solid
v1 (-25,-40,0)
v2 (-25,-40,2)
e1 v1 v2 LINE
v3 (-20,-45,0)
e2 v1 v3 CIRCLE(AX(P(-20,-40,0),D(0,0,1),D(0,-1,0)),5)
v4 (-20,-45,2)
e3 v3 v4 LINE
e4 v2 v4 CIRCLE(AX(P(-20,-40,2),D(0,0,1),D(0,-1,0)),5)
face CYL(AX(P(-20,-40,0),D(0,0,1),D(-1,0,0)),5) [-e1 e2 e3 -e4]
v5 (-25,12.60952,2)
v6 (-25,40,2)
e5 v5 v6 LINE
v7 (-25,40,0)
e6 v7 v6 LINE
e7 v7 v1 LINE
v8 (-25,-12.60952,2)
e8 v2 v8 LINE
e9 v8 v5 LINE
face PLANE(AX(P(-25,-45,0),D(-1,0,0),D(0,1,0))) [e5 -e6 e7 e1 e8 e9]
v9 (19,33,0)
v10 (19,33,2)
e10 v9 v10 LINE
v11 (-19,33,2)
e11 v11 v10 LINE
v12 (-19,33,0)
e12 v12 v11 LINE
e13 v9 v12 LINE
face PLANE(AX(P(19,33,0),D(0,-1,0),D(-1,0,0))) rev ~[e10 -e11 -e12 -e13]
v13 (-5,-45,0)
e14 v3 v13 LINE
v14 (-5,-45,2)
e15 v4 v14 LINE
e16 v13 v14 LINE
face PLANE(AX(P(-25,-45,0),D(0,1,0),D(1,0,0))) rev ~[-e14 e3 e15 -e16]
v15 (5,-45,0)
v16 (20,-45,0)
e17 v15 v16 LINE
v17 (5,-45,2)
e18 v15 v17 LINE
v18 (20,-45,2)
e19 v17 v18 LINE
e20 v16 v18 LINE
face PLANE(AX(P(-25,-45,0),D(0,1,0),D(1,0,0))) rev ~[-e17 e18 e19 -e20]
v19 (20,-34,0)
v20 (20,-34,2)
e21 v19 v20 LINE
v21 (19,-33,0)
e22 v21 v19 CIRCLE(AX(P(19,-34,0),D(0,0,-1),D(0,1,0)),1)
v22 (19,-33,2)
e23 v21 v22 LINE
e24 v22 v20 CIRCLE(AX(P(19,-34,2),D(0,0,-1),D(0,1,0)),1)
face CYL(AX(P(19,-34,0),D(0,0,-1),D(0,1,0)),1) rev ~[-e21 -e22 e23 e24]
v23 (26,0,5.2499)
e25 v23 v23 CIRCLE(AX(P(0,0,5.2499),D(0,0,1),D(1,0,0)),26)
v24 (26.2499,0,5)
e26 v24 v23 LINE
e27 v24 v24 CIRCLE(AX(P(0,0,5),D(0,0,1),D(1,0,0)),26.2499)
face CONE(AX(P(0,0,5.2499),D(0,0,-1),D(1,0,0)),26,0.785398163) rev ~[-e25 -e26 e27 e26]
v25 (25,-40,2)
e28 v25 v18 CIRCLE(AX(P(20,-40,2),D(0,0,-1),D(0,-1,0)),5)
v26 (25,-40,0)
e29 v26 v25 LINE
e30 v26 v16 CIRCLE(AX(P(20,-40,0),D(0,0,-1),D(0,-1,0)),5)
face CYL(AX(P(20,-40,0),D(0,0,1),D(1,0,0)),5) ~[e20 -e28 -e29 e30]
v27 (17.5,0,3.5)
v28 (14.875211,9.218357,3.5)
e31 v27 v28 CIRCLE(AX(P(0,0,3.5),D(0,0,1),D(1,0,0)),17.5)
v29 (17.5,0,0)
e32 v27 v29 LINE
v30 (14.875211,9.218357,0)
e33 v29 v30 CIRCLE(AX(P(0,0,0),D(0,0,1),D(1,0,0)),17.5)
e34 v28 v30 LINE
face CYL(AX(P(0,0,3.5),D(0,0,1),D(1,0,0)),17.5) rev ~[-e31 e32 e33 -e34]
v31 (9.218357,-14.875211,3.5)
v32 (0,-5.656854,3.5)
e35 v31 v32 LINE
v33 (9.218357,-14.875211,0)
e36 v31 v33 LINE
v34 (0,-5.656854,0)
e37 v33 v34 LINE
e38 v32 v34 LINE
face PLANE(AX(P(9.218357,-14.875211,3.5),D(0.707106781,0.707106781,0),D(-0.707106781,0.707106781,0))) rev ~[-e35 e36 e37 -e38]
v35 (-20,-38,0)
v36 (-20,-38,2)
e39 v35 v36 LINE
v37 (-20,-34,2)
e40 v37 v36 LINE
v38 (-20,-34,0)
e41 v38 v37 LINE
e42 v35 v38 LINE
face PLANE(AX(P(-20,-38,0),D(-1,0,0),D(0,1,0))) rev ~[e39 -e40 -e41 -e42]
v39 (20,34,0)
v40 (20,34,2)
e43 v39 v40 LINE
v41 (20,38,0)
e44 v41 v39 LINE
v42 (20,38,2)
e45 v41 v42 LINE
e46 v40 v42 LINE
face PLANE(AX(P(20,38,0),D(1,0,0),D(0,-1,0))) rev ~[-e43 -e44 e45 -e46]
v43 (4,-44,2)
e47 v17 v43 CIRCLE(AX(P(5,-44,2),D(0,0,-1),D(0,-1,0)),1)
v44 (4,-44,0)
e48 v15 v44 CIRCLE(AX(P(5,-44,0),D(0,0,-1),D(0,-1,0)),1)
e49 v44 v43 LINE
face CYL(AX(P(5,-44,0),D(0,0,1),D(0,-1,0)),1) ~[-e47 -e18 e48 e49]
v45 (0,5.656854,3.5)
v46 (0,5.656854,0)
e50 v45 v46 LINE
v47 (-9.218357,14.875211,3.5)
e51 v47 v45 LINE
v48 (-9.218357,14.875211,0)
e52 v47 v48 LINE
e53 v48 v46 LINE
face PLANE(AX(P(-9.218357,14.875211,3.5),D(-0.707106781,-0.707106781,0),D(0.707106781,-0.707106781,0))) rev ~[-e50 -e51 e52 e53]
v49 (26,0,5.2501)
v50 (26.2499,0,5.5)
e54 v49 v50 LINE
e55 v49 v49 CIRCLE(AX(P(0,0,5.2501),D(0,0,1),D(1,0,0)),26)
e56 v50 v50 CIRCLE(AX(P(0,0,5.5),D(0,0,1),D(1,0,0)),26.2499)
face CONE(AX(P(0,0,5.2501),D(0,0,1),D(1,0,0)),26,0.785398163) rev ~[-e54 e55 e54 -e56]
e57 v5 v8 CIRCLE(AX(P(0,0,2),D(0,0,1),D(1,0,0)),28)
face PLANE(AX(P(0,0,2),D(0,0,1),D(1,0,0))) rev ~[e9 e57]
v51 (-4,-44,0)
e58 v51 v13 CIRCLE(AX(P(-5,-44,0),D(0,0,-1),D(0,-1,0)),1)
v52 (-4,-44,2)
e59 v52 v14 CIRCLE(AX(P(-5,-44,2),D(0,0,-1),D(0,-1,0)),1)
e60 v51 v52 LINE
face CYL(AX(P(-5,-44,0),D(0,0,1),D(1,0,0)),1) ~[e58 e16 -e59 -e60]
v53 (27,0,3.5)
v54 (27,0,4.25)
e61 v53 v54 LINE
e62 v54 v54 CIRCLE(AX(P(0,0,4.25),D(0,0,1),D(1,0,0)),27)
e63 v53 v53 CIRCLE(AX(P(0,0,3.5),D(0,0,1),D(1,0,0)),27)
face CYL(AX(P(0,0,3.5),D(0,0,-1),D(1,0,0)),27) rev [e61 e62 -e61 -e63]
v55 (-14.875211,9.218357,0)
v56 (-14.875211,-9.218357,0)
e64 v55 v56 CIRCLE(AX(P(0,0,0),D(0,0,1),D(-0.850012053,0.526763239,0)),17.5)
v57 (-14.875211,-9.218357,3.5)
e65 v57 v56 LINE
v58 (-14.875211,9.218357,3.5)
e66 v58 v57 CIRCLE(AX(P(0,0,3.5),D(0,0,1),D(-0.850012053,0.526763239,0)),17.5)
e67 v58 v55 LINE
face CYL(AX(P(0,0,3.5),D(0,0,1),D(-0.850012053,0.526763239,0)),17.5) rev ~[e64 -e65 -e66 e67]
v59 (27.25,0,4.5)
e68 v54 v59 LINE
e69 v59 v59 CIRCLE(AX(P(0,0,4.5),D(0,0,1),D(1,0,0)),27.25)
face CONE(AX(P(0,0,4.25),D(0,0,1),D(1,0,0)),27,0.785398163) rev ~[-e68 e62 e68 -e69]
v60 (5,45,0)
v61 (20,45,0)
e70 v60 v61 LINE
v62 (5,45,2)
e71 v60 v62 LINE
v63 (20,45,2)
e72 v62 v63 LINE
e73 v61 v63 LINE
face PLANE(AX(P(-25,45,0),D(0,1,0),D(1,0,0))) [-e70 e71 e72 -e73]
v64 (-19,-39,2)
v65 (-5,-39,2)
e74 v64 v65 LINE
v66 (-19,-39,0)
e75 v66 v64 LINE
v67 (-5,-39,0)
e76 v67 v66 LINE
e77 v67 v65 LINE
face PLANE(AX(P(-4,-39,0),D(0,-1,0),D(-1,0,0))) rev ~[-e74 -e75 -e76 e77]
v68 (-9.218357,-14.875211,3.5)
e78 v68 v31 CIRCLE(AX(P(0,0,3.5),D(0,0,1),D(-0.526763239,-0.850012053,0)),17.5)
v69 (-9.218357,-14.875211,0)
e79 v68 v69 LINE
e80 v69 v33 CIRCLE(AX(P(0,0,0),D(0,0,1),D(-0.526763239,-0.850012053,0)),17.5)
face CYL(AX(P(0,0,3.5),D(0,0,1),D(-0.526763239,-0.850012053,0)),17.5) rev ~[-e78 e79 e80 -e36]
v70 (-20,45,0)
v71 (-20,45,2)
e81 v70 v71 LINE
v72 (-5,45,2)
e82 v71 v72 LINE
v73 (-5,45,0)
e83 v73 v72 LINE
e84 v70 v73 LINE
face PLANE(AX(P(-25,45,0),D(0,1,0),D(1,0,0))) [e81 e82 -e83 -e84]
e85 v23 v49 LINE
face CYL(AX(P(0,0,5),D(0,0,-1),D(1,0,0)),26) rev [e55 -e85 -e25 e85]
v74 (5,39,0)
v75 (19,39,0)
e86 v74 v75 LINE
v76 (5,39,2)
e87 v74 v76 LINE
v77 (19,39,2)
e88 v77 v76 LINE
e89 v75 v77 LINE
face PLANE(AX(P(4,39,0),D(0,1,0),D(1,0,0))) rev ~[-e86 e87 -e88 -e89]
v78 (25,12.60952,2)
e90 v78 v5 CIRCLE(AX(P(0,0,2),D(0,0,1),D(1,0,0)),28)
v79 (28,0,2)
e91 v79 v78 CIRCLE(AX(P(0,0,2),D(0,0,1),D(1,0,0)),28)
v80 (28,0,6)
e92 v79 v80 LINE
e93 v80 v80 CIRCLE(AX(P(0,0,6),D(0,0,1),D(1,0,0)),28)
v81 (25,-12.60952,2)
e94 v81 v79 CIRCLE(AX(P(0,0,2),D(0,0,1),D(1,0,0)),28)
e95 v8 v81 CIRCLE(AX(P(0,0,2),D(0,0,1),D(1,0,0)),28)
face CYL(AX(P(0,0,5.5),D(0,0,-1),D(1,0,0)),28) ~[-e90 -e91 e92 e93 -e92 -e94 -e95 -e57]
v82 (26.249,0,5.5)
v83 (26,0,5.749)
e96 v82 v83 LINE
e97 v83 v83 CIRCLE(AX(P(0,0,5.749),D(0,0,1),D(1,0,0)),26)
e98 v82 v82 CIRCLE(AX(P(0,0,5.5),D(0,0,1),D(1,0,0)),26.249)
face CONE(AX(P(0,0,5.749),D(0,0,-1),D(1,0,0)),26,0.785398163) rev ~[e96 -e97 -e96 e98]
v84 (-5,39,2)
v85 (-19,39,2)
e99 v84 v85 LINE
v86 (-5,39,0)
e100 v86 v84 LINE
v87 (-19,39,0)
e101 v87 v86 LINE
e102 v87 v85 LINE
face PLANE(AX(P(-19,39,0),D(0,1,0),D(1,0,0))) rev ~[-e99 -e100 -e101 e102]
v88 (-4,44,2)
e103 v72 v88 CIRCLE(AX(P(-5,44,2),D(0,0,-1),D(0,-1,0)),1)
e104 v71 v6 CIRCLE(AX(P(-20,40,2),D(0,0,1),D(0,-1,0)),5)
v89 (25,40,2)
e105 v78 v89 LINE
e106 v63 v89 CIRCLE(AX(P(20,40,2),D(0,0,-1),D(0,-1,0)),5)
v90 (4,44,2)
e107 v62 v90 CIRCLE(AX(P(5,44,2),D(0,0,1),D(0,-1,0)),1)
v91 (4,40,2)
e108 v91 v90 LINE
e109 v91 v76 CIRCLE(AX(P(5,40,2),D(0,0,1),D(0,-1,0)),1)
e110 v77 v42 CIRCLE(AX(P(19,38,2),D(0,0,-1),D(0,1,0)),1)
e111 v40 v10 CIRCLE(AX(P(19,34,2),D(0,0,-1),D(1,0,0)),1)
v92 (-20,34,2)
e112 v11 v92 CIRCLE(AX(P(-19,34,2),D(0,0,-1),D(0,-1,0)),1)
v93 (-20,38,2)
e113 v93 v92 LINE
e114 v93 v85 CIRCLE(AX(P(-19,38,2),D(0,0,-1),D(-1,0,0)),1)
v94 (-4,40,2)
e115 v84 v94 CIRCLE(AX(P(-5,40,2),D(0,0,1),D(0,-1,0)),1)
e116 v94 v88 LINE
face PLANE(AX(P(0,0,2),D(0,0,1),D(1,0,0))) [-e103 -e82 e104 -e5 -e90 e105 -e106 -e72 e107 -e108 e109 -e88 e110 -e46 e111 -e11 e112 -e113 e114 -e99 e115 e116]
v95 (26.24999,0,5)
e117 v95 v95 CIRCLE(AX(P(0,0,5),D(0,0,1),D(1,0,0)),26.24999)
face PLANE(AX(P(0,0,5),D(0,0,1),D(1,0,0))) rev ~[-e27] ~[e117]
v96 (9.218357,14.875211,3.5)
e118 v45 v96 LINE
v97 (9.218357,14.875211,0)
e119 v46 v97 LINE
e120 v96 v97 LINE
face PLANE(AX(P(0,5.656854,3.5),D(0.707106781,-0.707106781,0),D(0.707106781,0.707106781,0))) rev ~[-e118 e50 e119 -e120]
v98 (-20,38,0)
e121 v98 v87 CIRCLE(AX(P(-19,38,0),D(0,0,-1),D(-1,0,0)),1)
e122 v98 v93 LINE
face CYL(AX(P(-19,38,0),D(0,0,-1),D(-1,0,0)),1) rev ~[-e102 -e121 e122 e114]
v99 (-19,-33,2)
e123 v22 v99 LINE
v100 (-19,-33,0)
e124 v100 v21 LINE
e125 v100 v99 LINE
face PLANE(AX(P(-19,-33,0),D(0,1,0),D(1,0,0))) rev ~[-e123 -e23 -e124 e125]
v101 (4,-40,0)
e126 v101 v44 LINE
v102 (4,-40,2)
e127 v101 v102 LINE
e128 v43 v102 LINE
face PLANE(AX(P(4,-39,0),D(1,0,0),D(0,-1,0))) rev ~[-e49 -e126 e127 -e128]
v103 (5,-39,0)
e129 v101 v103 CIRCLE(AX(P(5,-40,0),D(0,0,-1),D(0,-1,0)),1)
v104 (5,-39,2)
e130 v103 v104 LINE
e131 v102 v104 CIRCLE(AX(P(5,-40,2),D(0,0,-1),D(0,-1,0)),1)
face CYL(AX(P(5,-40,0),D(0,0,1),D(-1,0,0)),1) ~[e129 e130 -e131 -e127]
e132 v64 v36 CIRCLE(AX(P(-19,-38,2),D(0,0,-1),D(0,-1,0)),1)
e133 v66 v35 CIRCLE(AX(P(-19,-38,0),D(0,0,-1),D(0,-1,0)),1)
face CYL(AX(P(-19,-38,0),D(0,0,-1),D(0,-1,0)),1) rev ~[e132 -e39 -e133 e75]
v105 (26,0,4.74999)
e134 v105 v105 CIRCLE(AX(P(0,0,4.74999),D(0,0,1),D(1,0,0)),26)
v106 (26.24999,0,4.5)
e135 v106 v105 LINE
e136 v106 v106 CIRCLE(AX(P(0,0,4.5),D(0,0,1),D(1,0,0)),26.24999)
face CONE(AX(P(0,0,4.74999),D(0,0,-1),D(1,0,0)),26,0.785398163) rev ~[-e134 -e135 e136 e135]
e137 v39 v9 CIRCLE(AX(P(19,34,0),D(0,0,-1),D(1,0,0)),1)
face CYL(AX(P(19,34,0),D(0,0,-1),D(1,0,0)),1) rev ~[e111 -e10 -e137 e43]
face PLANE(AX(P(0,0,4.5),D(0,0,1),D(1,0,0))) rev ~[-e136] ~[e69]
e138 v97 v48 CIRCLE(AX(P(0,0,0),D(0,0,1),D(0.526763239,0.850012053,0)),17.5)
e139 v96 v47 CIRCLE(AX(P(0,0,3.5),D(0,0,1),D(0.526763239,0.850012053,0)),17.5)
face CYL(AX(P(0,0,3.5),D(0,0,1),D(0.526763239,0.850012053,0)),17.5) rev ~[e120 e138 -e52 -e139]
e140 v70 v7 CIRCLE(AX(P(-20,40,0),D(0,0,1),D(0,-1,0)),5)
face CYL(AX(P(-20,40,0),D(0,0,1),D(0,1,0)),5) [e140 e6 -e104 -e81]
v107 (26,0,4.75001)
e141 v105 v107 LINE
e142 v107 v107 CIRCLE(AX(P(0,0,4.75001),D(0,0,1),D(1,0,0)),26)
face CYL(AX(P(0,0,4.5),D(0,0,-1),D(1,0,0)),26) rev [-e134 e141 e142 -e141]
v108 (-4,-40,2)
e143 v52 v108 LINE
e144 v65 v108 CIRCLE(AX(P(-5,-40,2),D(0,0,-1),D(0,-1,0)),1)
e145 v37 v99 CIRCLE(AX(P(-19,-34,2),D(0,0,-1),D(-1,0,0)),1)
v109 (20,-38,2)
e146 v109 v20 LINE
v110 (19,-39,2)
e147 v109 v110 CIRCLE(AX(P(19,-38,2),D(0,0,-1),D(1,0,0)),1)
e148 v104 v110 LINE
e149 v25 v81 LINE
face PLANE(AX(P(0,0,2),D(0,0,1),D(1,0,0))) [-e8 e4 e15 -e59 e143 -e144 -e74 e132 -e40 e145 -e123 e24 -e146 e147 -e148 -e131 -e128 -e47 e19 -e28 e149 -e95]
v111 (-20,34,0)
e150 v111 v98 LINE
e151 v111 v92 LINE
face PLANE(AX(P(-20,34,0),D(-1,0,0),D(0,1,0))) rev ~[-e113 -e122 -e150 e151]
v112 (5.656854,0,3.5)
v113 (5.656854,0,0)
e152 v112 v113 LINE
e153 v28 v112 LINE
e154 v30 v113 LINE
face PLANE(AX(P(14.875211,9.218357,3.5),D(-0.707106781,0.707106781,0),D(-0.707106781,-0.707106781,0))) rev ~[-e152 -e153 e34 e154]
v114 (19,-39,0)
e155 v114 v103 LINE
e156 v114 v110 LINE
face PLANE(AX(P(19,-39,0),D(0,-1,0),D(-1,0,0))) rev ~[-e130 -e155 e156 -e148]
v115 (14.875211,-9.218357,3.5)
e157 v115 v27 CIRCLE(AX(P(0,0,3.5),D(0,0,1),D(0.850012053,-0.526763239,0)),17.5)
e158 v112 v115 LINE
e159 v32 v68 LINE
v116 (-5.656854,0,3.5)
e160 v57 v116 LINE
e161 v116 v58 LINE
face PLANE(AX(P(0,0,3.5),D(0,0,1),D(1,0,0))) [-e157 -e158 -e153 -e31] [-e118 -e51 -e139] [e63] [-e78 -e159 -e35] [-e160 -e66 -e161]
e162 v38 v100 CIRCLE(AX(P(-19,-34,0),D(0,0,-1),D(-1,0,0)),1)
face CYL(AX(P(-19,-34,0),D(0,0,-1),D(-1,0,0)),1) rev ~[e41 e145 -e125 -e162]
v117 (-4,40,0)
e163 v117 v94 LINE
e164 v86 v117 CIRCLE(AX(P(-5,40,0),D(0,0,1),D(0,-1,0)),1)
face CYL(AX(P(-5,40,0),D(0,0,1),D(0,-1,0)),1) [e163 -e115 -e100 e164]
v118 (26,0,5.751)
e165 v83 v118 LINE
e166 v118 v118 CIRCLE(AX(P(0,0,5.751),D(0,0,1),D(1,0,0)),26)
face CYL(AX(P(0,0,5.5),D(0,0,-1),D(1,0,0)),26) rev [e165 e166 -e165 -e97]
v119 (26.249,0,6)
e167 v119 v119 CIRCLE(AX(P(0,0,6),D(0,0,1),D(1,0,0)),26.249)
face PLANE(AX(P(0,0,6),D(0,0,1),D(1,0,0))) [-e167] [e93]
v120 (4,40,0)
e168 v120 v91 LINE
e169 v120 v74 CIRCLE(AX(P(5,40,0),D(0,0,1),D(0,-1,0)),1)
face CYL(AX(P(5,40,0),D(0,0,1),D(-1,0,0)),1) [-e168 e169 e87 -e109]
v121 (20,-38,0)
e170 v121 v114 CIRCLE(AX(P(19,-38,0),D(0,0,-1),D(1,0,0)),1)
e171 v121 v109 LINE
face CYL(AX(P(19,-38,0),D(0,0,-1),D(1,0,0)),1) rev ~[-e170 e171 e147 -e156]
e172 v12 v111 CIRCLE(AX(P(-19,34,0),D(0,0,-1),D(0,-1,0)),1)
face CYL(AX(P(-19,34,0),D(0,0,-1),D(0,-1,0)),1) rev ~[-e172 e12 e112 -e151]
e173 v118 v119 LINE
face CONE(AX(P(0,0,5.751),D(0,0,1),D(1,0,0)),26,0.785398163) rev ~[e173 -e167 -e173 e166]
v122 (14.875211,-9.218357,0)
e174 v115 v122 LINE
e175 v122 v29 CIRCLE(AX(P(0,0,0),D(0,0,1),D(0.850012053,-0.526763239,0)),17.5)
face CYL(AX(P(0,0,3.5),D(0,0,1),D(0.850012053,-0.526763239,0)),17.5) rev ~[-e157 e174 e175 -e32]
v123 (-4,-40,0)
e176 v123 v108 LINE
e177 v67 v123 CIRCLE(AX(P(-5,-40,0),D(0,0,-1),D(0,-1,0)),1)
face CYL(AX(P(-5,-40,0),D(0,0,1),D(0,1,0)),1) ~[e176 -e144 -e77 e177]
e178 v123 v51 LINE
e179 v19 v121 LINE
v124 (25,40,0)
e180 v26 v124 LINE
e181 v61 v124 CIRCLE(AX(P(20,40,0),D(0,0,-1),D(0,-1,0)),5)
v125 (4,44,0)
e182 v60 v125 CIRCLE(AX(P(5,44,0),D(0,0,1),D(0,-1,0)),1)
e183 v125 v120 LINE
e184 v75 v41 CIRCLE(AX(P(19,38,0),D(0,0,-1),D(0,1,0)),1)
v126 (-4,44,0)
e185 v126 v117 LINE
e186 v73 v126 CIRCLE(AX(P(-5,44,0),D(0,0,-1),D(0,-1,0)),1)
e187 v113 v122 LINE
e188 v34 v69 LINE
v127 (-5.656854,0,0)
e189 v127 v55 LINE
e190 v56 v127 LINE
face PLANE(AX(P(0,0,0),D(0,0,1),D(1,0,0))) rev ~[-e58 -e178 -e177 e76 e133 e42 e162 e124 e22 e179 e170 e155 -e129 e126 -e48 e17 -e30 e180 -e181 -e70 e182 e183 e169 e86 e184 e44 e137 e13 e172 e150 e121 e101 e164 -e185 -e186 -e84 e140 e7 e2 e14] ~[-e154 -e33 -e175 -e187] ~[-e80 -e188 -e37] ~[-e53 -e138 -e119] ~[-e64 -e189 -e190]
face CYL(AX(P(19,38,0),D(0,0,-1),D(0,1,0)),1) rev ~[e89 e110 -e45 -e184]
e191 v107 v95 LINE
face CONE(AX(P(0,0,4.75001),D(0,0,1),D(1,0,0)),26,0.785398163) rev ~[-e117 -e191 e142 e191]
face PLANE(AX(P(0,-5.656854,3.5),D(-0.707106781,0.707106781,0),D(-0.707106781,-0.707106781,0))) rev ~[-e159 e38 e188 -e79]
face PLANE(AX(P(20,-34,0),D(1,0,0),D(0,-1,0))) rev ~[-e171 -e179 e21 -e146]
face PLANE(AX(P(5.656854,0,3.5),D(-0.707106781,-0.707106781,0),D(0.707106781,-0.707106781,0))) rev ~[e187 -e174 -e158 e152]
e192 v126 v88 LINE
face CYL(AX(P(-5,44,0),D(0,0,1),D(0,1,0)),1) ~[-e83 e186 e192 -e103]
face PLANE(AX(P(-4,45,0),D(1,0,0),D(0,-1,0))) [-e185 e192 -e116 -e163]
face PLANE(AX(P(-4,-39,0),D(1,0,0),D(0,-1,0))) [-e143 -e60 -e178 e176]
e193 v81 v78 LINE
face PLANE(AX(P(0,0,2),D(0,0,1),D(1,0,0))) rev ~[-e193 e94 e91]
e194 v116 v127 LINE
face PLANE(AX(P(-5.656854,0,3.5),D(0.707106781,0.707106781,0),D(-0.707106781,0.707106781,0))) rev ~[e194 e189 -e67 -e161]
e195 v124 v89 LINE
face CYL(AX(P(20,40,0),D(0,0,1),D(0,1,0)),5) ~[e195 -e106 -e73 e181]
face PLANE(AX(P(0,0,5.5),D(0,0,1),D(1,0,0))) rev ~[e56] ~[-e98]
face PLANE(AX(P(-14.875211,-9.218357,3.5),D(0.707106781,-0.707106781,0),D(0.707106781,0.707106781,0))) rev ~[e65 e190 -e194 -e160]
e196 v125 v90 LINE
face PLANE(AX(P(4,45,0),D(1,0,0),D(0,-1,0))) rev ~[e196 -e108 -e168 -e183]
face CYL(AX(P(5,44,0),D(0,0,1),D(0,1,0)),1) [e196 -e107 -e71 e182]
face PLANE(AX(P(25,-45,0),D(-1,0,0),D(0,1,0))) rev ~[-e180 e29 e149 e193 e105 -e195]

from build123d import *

# Parameters (mm, degrees)
F0_W      = 50
F0_H      = 90
F1_DEPTH  = 2
F2_R      = 28
F3_DEPTH  = 1.5
F4_R      = 28
F4_R_2    = 27
F5_DEPTH  = 1
F6_W      = 3
F6_H      = 70
F7_DEPTH  = 3
F8_DEPTH  = 3
F10_DEPTH = 25
F11_W     = 8
F11_H     = 6
F12_DEPTH = 25
F13_R     = 1
F14_R     = 1
F15_R     = 5
F18_SIZE  = 0.25
F19_R     = 28
F19_R_2   = 27.25
F19_R_3   = 26
F20_DEPTH = 0.5
F21_SIZE  = 0.24999
F22_R     = 28
F22_R_2   = 26.24999
F22_R_3   = 26
F23_DEPTH = 0.5
F24_SIZE  = 0.2499
F25_R     = 28
F25_R_2   = 26.2499
F25_R_3   = 26
F26_DEPTH = 0.5
F27_SIZE  = 0.249


# Not quite as in the source:
# - a fillet or chamfer is up to 0.001 mm smaller than in the source, because OpenCascade refuses the exact size


with BuildPart() as f1:
    # F0 (on Top) → F1 (new body)
    with BuildSketch(Plane.XY):
        Rectangle(F0_W, F0_H)
    extrude(amount=F1_DEPTH)

    # F2 (on face) → F3 (join)
    with BuildSketch(Plane.XY.offset(2)):
        Circle(F2_R)
    extrude(amount=F3_DEPTH)

    # F4 (on face) → F5 (join)
    with BuildSketch(Plane.XY.offset(3.5)):
        Circle(F4_R)
        Circle(F4_R_2, mode=Mode.SUBTRACT)
    extrude(amount=F5_DEPTH)

    # F6 (on face) → F7 (join)
    with BuildSketch(Plane(origin=(0, 0, 0), x_dir=(1, 0, 0), z_dir=(0, 0, -1))):
        with Locations((-23.5, 0)):
            Rectangle(F6_W, F6_H)
        with Locations((23.5, 0)):
            Rectangle(F6_W, F6_H)
    extrude(amount=F7_DEPTH)

    # F8 (cut, through all): faces of the model
    f8_faces = [f1.faces().sort_by_distance(p)[0] for p in [
        (-23.5, 0, -3),
        (23.5, 0, -3),
        (-23.5, 0, -3),
        (23.5, 0, -3),
    ]]
    extrude(f8_faces, amount=-F8_DEPTH, mode=Mode.SUBTRACT)

    # F9 (on face) → F10 (cut)
    with BuildSketch(Plane.XY.offset(3.5)):
        with BuildLine():
            Line((-5.6568542495, 0), (-14.8752109279, 9.2183566784))
            ThreePointArc((-14.8752109279, 9.2183566784), (-17.5, 0), (-14.8752109279, -9.2183566784))
            Line((-14.8752109279, -9.2183566784), (-5.6568542495, 0))
        make_face()
        with BuildLine():
            ThreePointArc((-9.2183566784, -14.8752109279), (0, -17.5), (9.2183566784, -14.8752109279))
            Line((9.2183566784, -14.8752109279), (0, -5.6568542495))
            Line((0, -5.6568542495), (-9.2183566784, -14.8752109279))
        make_face()
        with BuildLine():
            ThreePointArc((14.8752109279, -9.2183566784), (16.831015882, -4.7923798244), (17.5, 0))
            ThreePointArc((17.5, 0), (16.831015882, 4.7923798244), (14.8752109279, 9.2183566784))
            Line((14.8752109279, 9.2183566784), (5.6568542495, 0))
            Line((5.6568542495, 0), (14.8752109279, -9.2183566784))
        make_face()
        with BuildLine():
            Line((0, 5.6568542495), (9.2183566784, 14.8752109279))
            ThreePointArc((9.2183566784, 14.8752109279), (0, 17.5), (-9.2183566784, 14.8752109279))
            Line((-9.2183566784, 14.8752109279), (0, 5.6568542495))
        make_face()
    extrude(amount=-F10_DEPTH, mode=Mode.SUBTRACT)

    # F11 (on face) → F12 (cut)
    with BuildSketch(Plane(origin=(0, 0, 0), x_dir=(1, 0, 0), z_dir=(0, 0, -1))):
        with Locations((0, -42)):
            Rectangle(F11_W, F11_H)
        with BuildLine():
            Line((-4, -39), (4, -39))
            Line((4, -39), (19, -39))
            ThreePointArc((19, -39), (19.7071067812, -38.7071067812), (20, -38))
            Line((20, -38), (20, -34))
            ThreePointArc((20, -34), (19.7071067812, -33.2928932188), (19, -33))
            Line((19, -33), (-19, -33))
            ThreePointArc((-19, -33), (-19.7071067812, -33.2928932188), (-20, -34))
            Line((-20, -34), (-20, -38))
            ThreePointArc((-20, -38), (-19.7071067812, -38.7071067812), (-19, -39))
            Line((-19, -39), (-4, -39))
        make_face()
        with Locations((0, 42)):
            Rectangle(F11_W, F11_H)
        with BuildLine():
            ThreePointArc((20, 38), (19.7071067812, 38.7071067812), (19, 39))
            Line((19, 39), (4, 39))
            Line((4, 39), (-4, 39))
            Line((-4, 39), (-19, 39))
            ThreePointArc((-19, 39), (-19.7071067812, 38.7071067812), (-20, 38))
            Line((-20, 38), (-20, 34))
            ThreePointArc((-20, 34), (-19.7071067812, 33.2928932188), (-19, 33))
            Line((-19, 33), (19, 33))
            ThreePointArc((19, 33), (19.7071067812, 33.2928932188), (20, 34))
            Line((20, 34), (20, 38))
        make_face()
    extrude(amount=-F12_DEPTH, mode=Mode.SUBTRACT)

    # F13
    f13_edges = [f1.edges().sort_by_distance(p)[0] for p in [
        (-4, -45, 1),
        (-4, -39, 1),
        (4, -45, 1),
        (4, -39, 1),
    ]]
    fillet(f13_edges, radius=F13_R)

    # F14
    f14_edges = [f1.edges().sort_by_distance(p)[0] for p in [
        (4, 45, 1),
        (4, 39, 1),
        (-4, 45, 1),
        (-4, 39, 1),
    ]]
    fillet(f14_edges, radius=F14_R)

    # F15
    f15_edges = [f1.edges().sort_by_distance(p)[0] for p in [
        (25, -45, 1),
        (25, 45, 1),
        (-25, 45, 1),
        (-25, -45, 1),
    ]]
    fillet(f15_edges, radius=F15_R)


with BuildPart() as f16_1:
    # F16: copy of F1
    add(f1.part.moved(Location((72.1, 0, 0))))


with BuildPart() as f1_1:
    add(f1.part)

    # F18
    f18_edges = [f1_1.edges().sort_by_distance(p)[0] for p in [
        (-27, 0, 4.5),
    ]]
    chamfer(f18_edges, length=F18_SIZE)

    # F19 (on face) → F20 (join)
    with BuildSketch(Plane.XY.offset(4.5)):
        Circle(F19_R)
        Circle(F19_R_2, mode=Mode.SUBTRACT)
        Circle(F19_R_2)
        Circle(F19_R_3, mode=Mode.SUBTRACT)
    extrude(amount=F20_DEPTH)

    # F21 (size 0.25 in the source; OpenCascade refuses exactly that, so slightly less here)
    f21_edges = [f1_1.edges().sort_by_distance(p)[0] for p in [
        (-26, 0, 4.5),
        (-26, 0, 5),
    ]]
    chamfer(f21_edges, length=F21_SIZE)

    # F22 (on face) → F23 (join)
    with BuildSketch(Plane.XY.offset(5)):
        Circle(F22_R)
        Circle(F22_R_2, mode=Mode.SUBTRACT)
        Circle(F22_R_2)
        Circle(F22_R_3, mode=Mode.SUBTRACT)
    extrude(amount=F23_DEPTH)

    # F24 (size 0.25 in the source; OpenCascade refuses exactly that, so slightly less here)
    f24_edges = [f1_1.edges().sort_by_distance(p)[0] for p in [
        (-26, 0, 5),
        (-26, 0, 5.5),
    ]]
    chamfer(f24_edges, length=F24_SIZE)

    # F25 (on face) → F26 (join)
    with BuildSketch(Plane.XY.offset(5.5)):
        Circle(F25_R)
        Circle(F25_R_2, mode=Mode.SUBTRACT)
        Circle(F25_R_2)
        Circle(F25_R_3, mode=Mode.SUBTRACT)
    extrude(amount=F26_DEPTH)

    # F27 (size 0.25 in the source; OpenCascade refuses exactly that, so slightly less here)
    f27_edges = [f1_1.edges().sort_by_distance(p)[0] for p in [
        (-26, 0, 6),
        (-26, 0, 5.5),
    ]]
    chamfer(f27_edges, length=F27_SIZE)


solid = f1_1.part
